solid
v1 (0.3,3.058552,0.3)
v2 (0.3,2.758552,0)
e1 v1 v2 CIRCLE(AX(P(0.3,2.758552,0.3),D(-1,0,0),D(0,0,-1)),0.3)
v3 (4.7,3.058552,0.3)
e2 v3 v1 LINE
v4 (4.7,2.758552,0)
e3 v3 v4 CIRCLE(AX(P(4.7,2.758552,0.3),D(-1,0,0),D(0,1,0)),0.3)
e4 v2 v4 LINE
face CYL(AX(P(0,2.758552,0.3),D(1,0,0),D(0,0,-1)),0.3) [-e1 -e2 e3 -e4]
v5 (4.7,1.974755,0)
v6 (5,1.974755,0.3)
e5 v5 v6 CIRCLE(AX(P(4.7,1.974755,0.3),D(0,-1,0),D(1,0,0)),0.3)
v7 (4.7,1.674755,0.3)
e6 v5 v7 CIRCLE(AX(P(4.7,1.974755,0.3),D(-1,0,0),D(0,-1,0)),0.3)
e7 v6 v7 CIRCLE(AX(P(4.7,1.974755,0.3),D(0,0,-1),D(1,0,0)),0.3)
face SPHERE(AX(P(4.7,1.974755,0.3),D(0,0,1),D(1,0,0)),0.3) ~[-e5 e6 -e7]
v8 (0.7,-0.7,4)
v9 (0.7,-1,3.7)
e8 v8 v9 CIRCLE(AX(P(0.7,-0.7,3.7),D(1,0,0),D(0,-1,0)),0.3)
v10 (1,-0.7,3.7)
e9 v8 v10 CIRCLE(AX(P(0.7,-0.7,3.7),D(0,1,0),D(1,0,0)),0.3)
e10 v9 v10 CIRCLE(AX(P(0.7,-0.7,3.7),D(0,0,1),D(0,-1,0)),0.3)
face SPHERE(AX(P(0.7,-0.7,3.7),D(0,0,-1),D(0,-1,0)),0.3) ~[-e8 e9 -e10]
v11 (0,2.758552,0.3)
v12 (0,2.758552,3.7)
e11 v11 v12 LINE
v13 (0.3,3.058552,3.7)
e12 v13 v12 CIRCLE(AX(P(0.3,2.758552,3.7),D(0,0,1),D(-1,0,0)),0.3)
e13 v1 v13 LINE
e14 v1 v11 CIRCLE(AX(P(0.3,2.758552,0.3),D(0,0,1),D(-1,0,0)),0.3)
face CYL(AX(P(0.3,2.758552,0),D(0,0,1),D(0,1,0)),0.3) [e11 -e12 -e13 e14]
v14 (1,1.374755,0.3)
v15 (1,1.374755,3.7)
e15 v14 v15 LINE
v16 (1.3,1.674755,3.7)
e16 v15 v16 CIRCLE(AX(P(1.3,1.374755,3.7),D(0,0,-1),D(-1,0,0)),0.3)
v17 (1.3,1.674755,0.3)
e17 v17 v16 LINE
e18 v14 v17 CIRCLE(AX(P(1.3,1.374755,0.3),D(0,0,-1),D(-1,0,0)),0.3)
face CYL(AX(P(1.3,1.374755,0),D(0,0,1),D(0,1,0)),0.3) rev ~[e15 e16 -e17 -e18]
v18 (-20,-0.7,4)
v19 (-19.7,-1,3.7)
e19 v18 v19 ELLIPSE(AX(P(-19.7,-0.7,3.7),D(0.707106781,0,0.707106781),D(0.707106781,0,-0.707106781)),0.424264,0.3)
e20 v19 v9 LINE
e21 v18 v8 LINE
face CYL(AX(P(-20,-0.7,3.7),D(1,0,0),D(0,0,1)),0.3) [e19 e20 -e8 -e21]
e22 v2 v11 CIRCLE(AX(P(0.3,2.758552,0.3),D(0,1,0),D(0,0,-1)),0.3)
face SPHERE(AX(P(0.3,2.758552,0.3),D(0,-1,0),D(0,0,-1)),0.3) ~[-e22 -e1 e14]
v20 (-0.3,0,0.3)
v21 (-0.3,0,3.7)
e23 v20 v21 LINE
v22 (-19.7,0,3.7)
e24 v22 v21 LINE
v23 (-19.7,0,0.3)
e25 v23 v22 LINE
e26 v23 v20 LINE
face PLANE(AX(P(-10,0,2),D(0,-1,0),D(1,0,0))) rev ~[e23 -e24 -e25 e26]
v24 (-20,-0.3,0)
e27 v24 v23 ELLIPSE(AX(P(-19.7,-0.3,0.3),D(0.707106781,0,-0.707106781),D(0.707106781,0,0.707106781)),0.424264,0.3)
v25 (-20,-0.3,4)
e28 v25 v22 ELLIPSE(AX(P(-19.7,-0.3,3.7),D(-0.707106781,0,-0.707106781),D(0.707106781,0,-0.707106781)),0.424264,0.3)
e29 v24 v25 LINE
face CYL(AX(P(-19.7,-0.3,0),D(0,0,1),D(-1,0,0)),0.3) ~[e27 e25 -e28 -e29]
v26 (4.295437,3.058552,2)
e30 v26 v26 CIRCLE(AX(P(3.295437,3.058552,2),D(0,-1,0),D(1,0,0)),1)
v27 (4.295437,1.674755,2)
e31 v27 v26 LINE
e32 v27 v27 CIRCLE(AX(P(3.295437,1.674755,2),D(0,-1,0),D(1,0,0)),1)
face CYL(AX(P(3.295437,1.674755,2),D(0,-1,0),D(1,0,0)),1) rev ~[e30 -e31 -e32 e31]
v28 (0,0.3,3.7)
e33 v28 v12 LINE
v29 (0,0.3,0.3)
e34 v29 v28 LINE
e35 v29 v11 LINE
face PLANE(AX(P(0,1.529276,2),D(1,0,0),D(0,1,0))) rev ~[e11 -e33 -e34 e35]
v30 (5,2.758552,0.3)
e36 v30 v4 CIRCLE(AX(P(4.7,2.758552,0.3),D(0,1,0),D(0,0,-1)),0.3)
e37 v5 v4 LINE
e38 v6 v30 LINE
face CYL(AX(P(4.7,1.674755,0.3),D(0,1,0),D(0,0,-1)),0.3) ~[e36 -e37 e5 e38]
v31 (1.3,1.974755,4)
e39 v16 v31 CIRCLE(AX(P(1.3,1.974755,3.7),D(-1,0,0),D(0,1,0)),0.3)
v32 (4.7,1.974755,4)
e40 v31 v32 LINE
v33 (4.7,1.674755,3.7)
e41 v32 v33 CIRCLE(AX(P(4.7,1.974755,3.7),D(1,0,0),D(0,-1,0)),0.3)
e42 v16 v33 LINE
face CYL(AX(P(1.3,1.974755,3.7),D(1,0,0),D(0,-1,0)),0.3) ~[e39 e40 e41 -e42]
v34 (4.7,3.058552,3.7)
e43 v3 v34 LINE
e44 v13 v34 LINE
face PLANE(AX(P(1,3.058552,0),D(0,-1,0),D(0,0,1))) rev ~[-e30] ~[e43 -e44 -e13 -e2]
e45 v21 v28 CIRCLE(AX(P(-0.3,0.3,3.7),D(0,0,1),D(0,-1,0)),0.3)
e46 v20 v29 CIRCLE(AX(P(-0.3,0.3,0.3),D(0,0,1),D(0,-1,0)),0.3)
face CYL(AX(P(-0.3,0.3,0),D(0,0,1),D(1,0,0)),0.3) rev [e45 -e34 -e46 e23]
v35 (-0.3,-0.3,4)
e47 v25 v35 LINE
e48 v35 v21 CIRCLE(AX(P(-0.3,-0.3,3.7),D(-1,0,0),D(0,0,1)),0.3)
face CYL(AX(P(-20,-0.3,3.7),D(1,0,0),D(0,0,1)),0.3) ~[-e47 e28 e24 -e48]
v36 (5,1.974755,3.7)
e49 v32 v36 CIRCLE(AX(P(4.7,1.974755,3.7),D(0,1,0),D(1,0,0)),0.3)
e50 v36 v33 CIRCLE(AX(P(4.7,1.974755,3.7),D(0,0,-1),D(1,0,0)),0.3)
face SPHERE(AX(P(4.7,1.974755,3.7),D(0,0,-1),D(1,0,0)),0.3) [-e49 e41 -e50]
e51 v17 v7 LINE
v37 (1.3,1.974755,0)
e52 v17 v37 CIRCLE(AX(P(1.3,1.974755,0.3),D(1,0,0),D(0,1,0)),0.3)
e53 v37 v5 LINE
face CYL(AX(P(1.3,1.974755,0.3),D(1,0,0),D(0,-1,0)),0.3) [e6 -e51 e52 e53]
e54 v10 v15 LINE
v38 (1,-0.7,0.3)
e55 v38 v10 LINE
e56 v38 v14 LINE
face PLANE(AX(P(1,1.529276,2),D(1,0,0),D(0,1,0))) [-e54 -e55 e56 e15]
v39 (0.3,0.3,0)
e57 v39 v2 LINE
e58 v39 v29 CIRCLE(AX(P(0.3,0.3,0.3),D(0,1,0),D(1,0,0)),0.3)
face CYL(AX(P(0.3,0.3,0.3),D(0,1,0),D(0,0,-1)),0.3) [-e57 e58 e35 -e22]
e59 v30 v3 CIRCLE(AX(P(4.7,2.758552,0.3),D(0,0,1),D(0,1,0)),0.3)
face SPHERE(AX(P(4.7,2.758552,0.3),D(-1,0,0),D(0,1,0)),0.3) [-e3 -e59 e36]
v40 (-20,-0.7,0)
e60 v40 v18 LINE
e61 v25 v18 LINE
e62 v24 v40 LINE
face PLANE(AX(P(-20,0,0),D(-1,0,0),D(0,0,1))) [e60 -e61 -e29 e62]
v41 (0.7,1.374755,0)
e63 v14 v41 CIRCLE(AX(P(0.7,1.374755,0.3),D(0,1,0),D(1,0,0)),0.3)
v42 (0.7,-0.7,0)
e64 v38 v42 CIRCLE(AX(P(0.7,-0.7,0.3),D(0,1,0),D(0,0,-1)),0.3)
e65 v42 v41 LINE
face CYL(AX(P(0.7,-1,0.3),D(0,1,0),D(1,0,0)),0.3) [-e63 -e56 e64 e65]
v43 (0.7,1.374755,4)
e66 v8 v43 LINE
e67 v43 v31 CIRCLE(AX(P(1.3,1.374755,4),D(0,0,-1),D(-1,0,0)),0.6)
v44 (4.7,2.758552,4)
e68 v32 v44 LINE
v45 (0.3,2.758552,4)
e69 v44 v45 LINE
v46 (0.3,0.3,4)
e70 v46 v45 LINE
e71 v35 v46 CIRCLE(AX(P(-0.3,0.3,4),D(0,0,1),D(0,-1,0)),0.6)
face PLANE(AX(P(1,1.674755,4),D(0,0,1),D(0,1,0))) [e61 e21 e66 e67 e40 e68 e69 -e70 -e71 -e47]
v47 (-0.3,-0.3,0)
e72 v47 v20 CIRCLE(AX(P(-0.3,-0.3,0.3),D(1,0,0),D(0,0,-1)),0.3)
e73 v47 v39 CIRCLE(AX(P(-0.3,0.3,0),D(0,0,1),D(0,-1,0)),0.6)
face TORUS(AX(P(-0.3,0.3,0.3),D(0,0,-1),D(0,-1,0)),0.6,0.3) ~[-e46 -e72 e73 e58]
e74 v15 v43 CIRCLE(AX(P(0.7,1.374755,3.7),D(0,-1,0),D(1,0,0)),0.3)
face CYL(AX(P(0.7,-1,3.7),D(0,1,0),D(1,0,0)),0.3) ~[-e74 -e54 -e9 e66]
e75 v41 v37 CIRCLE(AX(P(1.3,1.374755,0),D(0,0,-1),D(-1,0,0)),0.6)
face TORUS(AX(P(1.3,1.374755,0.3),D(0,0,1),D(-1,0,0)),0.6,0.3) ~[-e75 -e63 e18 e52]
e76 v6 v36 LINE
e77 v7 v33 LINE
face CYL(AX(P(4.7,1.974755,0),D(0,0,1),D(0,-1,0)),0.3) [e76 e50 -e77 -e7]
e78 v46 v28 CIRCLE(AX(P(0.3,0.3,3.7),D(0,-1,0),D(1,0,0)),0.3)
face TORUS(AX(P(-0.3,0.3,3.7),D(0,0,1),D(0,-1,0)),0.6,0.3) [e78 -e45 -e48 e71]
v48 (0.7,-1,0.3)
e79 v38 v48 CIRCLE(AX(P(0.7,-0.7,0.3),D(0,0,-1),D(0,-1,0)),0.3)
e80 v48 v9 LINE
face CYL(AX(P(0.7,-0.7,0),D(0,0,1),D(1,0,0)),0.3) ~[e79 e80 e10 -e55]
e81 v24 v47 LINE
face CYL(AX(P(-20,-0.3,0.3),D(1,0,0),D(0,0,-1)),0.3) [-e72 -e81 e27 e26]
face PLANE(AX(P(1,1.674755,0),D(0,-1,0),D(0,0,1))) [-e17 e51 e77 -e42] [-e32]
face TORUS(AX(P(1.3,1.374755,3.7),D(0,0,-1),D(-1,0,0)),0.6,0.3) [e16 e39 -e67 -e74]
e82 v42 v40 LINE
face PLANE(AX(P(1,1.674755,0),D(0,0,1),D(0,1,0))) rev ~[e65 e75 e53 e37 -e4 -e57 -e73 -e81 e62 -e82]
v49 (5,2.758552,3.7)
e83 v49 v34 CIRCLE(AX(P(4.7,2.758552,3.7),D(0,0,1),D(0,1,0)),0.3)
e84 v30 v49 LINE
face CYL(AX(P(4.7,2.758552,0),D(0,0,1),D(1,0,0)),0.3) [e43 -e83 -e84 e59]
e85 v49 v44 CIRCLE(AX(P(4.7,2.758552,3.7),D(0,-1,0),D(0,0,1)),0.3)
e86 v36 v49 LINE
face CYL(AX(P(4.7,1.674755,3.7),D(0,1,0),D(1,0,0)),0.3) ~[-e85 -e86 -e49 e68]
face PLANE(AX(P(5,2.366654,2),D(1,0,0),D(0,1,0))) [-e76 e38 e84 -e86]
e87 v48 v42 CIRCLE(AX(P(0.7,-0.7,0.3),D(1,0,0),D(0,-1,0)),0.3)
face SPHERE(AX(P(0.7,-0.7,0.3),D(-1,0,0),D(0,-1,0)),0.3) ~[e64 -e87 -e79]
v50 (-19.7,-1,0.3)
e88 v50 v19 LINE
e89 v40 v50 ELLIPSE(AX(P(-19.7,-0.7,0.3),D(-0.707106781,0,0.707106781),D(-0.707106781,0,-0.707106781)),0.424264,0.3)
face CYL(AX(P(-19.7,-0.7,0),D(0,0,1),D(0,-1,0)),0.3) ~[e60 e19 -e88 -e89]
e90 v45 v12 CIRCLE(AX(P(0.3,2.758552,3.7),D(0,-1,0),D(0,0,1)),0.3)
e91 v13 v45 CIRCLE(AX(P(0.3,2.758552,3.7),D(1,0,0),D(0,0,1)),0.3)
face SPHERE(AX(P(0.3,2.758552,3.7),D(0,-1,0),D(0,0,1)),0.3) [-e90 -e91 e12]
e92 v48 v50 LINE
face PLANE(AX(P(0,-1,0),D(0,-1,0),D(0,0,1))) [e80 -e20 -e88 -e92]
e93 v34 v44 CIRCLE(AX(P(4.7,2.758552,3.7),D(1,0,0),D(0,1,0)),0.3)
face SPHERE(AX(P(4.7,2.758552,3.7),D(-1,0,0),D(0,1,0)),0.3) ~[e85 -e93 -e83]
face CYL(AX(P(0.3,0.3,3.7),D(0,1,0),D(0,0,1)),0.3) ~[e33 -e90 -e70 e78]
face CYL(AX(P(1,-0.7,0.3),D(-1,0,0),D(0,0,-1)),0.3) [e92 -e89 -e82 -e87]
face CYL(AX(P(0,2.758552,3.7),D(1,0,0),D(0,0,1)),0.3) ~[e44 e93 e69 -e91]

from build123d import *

# Parameters (mm, degrees)
F0_W     = 20
F0_H     = 4
F1_DEPTH = 1
F2_W     = 3.0585520435
F2_H     = 4
F2_W_2   = 1
F3_DEPTH = 1
F4_W     = 1.3837967999
F4_H     = 4
F5_DEPTH = 4
F6_R     = 1
F7_DEPTH = 2
F8_F1_R  = 0.3
F8_F2_R  = 0.3


with BuildPart() as f1:
    # F0 (on Front) → F1 (new body)
    with BuildSketch(Plane.XZ):
        with Locations((-10, 2)):
            Rectangle(F0_W, F0_H)
    extrude(amount=F1_DEPTH)

    # F2 (on face) → F3 (join)
    with BuildSketch(Plane.YZ):
        with Locations((1.5292760218, 2)):
            Rectangle(F2_W, F2_H)
        with Locations((-0.5, 2)):
            Rectangle(F2_W_2, F2_H)
    extrude(amount=F3_DEPTH)

    # F4 (on face) → F5 (join)
    with BuildSketch(Plane.YZ.offset(1)):
        with Locations((2.3666536435, 2)):
            Rectangle(F4_W, F4_H)
    extrude(amount=F5_DEPTH)

    # F6 (on face) → F7 (cut)
    with BuildSketch(Plane.XZ.offset(-1.6747552436)):
        with Locations((3.2954369672, 2)):
            Circle(F6_R)
    extrude(amount=-F7_DEPTH, mode=Mode.SUBTRACT)

    # F8: fillet of radius 0.3 on 18 edges, made by hand

    # F8_f1
    f8_f1_edges = [f1.edges().sort_by_distance(p)[0] for p in [
        (0, 0, 2),
        (1, 1.6747552436, 2),
    ]]
    fillet(f8_f1_edges, radius=F8_F1_R)

    # F8_f2
    f8_f2_edges = [f1.edges().sort_by_distance(p)[0] for p in [
        (-9.5, -1, 0),
        (1, -1, 2),
        (-9.5, -1, 4),
        (-20, -1, 2),
        (-10.15, 0, 0),
        (-10.15, 0, 4),
        (-20, 0, 2),
        (2.5, 3.0585520435, 0),
        (2.5, 3.0585520435, 4),
        (5, 3.0585520435, 2),
        (0, 3.0585520435, 2),
        (5, 1.6747552436, 2),
        (5, 2.3666536435, 0),
        (5, 2.3666536435, 4),
        (3.15, 1.6747552436, 0),
        (3.15, 1.6747552436, 4),
        (1.0878679656, 1.5868872779, 4),
        (1.0878679656, 1.5868872779, 0),
        (-0.0878679656, 0.0878679656, 4),
        (-0.0878679656, 0.0878679656, 0),
    ]]
    fillet(f8_f2_edges, radius=F8_F2_R)


solid = f1.part
